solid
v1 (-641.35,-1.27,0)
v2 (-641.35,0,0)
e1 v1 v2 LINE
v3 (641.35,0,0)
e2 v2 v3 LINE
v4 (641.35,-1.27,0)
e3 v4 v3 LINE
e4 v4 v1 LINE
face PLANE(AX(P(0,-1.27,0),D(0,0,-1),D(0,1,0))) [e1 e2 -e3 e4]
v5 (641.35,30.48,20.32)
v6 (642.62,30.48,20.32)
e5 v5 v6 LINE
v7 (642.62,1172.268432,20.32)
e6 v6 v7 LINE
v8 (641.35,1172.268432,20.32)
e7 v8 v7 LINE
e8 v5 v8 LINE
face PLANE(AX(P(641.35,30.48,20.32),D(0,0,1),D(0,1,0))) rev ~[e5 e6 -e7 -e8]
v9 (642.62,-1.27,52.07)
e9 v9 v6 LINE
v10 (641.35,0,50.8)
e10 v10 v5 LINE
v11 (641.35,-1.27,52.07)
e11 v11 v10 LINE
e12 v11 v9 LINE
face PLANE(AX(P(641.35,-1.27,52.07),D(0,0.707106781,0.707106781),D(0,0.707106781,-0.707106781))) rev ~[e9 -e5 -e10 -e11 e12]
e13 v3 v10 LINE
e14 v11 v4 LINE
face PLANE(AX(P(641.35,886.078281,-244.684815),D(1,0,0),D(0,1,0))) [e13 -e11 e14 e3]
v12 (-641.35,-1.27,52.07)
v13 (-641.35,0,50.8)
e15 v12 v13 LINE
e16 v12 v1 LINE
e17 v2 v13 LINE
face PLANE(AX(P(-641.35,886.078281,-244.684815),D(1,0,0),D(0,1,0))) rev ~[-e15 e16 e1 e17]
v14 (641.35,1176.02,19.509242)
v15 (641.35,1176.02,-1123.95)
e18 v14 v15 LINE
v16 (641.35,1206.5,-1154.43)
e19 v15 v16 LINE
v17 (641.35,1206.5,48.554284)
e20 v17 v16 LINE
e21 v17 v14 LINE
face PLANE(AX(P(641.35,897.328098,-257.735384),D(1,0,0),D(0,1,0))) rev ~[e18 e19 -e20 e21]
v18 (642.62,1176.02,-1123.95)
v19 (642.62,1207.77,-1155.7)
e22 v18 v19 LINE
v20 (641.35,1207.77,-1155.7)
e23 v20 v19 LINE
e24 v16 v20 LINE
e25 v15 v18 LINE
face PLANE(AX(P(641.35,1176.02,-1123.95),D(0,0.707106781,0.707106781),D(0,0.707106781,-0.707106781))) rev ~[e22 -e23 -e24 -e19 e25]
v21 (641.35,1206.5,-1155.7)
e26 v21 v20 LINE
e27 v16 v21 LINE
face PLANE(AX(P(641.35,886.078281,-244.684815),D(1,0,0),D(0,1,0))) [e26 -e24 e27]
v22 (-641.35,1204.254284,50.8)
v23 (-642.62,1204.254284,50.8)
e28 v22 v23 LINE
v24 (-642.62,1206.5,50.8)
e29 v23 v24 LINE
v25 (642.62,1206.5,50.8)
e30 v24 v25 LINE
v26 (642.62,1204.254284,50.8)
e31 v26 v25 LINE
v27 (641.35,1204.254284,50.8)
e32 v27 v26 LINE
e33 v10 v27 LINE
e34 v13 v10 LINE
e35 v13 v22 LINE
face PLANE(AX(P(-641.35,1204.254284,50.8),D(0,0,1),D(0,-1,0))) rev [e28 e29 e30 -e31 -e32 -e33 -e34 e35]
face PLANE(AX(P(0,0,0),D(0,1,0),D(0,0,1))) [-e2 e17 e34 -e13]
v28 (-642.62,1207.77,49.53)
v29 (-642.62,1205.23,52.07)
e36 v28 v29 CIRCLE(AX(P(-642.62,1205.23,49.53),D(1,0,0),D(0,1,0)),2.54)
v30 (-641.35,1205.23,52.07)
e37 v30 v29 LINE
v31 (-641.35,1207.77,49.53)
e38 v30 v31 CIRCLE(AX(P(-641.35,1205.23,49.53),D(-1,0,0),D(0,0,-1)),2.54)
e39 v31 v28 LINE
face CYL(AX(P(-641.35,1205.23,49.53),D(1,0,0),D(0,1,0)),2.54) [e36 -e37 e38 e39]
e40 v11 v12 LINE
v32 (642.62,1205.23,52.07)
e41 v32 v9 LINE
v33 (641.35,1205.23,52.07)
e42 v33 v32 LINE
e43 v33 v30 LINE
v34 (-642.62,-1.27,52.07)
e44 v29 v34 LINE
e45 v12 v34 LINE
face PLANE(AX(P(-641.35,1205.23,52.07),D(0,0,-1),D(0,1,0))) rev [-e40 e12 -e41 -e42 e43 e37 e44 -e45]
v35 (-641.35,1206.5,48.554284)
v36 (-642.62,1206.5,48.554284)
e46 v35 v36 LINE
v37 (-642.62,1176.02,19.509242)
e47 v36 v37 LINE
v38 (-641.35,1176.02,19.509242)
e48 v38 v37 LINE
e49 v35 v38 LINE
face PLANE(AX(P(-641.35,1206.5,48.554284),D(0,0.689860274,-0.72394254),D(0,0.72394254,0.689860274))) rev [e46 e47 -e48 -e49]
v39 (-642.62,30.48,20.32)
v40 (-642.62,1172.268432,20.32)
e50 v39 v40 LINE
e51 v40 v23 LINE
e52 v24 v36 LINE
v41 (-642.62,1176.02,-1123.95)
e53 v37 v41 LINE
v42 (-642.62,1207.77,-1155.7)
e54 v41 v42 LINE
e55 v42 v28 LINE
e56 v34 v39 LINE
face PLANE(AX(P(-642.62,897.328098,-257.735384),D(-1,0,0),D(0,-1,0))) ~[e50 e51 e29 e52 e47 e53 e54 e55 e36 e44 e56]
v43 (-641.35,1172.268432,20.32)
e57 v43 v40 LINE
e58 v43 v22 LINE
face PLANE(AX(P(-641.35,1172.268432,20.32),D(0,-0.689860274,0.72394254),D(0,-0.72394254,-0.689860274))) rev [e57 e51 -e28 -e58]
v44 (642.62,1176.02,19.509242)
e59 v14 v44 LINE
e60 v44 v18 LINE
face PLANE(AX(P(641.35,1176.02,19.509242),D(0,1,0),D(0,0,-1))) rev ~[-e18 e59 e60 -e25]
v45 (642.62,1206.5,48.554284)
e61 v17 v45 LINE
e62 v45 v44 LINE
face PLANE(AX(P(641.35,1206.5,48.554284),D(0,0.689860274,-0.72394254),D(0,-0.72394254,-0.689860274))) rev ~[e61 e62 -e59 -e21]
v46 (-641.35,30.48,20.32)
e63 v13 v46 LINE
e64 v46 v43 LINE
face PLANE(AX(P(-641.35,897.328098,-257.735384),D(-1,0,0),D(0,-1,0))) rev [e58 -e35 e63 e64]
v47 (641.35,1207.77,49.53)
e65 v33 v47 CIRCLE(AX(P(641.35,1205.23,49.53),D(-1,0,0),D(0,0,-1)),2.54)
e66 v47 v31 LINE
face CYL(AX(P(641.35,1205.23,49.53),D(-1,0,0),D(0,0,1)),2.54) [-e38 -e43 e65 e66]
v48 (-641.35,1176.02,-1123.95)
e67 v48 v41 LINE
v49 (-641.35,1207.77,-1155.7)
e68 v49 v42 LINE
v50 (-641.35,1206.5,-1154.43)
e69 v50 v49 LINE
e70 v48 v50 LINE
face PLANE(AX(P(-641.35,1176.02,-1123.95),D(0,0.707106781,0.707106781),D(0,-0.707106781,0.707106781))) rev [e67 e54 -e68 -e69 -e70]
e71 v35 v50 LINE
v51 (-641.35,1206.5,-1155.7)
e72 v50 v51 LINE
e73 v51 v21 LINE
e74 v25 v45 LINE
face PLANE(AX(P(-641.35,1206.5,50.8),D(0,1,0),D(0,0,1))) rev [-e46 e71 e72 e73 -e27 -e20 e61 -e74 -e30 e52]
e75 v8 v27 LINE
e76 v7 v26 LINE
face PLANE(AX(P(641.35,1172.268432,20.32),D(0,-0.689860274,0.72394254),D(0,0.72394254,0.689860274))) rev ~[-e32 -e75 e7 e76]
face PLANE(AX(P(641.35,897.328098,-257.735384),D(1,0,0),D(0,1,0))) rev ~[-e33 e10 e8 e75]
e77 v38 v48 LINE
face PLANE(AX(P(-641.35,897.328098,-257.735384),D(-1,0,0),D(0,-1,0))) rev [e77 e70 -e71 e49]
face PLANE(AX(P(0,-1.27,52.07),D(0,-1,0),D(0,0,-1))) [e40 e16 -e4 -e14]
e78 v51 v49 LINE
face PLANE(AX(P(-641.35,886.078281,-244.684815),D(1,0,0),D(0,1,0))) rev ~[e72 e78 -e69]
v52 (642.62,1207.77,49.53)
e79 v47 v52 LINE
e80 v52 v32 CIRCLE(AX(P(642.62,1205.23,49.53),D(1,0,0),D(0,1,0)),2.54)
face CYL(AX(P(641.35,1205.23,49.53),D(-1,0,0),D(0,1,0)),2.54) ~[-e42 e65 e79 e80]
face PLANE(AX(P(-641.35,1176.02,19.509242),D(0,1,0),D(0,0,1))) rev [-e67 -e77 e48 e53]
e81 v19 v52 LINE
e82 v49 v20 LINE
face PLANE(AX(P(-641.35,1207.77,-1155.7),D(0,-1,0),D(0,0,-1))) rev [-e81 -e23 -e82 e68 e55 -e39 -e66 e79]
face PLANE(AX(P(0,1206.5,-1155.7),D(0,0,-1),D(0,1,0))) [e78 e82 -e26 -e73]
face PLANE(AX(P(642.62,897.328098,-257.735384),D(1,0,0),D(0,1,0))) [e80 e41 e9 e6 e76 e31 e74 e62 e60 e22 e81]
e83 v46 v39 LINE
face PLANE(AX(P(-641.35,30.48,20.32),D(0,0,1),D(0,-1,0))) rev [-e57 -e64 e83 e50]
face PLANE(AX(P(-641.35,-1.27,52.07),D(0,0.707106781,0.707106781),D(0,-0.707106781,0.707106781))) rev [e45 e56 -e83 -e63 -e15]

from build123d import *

# Parameters (mm, degrees)
F1_DEPTH = 641.35
F2_R     = 2.54
F4_DEPTH = 1.27


# Not quite as in the source:
# - a pattern or mirror of a feature is missing from the dataset's text; its kind, count and spacing are read off the source's solid


with BuildPart() as f1:
    # F0 (on Right) → F1 (new body, symmetric)
    with BuildSketch(Plane.YZ):
        Polygon((-1.27, 0), (0, 0), (0, 50.8), (1206.5, 50.8), (1206.5, -1155.7), (1207.77, -1155.7), (1207.77, 52.07), (-1.27, 52.07), align=None)
    extrude(amount=F1_DEPTH, both=True)

    # F2
    f2_edges = [f1.edges().sort_by_distance(p)[0] for p in [
        (0, 1207.77, 52.07),
    ]]
    fillet(f2_edges, radius=F2_R)

    # F3 (on face) → F4 (join)
    with BuildSketch(Plane.YZ.offset(641.35)):
        with BuildLine():
            Line((1205.23, 52.07), (-1.27, 52.07))
            Line((-1.27, 52.07), (30.48, 20.32))
            Line((30.48, 20.32), (1172.2684317215, 20.32))
            Line((1172.2684317215, 20.32), (1204.2542837185, 50.8))
            Line((1204.2542837185, 50.8), (1206.5, 50.8))
            Line((1206.5, 50.8), (1206.5, 48.5542837185))
            Line((1206.5, 48.5542837185), (1176.02, 19.5092421769))
            Line((1176.02, 19.5092421769), (1176.02, -1123.95))
            Line((1176.02, -1123.95), (1207.77, -1155.7))
            Line((1207.77, -1155.7), (1207.77, -1123.95))
            Line((1207.77, -1123.95), (1207.77, 49.53))
            ThreePointArc((1207.77, 49.53), (1207.0260512242, 51.3260512242), (1205.23, 52.07))
        make_face()
    f4 = extrude(amount=F4_DEPTH)

    # F4_copies: F4 across plane
    add(f4.mirror(Plane(origin=(0, 0, 0), x_dir=(0, 0, -1), z_dir=(-1, 0, 0))))


solid = f1.part
